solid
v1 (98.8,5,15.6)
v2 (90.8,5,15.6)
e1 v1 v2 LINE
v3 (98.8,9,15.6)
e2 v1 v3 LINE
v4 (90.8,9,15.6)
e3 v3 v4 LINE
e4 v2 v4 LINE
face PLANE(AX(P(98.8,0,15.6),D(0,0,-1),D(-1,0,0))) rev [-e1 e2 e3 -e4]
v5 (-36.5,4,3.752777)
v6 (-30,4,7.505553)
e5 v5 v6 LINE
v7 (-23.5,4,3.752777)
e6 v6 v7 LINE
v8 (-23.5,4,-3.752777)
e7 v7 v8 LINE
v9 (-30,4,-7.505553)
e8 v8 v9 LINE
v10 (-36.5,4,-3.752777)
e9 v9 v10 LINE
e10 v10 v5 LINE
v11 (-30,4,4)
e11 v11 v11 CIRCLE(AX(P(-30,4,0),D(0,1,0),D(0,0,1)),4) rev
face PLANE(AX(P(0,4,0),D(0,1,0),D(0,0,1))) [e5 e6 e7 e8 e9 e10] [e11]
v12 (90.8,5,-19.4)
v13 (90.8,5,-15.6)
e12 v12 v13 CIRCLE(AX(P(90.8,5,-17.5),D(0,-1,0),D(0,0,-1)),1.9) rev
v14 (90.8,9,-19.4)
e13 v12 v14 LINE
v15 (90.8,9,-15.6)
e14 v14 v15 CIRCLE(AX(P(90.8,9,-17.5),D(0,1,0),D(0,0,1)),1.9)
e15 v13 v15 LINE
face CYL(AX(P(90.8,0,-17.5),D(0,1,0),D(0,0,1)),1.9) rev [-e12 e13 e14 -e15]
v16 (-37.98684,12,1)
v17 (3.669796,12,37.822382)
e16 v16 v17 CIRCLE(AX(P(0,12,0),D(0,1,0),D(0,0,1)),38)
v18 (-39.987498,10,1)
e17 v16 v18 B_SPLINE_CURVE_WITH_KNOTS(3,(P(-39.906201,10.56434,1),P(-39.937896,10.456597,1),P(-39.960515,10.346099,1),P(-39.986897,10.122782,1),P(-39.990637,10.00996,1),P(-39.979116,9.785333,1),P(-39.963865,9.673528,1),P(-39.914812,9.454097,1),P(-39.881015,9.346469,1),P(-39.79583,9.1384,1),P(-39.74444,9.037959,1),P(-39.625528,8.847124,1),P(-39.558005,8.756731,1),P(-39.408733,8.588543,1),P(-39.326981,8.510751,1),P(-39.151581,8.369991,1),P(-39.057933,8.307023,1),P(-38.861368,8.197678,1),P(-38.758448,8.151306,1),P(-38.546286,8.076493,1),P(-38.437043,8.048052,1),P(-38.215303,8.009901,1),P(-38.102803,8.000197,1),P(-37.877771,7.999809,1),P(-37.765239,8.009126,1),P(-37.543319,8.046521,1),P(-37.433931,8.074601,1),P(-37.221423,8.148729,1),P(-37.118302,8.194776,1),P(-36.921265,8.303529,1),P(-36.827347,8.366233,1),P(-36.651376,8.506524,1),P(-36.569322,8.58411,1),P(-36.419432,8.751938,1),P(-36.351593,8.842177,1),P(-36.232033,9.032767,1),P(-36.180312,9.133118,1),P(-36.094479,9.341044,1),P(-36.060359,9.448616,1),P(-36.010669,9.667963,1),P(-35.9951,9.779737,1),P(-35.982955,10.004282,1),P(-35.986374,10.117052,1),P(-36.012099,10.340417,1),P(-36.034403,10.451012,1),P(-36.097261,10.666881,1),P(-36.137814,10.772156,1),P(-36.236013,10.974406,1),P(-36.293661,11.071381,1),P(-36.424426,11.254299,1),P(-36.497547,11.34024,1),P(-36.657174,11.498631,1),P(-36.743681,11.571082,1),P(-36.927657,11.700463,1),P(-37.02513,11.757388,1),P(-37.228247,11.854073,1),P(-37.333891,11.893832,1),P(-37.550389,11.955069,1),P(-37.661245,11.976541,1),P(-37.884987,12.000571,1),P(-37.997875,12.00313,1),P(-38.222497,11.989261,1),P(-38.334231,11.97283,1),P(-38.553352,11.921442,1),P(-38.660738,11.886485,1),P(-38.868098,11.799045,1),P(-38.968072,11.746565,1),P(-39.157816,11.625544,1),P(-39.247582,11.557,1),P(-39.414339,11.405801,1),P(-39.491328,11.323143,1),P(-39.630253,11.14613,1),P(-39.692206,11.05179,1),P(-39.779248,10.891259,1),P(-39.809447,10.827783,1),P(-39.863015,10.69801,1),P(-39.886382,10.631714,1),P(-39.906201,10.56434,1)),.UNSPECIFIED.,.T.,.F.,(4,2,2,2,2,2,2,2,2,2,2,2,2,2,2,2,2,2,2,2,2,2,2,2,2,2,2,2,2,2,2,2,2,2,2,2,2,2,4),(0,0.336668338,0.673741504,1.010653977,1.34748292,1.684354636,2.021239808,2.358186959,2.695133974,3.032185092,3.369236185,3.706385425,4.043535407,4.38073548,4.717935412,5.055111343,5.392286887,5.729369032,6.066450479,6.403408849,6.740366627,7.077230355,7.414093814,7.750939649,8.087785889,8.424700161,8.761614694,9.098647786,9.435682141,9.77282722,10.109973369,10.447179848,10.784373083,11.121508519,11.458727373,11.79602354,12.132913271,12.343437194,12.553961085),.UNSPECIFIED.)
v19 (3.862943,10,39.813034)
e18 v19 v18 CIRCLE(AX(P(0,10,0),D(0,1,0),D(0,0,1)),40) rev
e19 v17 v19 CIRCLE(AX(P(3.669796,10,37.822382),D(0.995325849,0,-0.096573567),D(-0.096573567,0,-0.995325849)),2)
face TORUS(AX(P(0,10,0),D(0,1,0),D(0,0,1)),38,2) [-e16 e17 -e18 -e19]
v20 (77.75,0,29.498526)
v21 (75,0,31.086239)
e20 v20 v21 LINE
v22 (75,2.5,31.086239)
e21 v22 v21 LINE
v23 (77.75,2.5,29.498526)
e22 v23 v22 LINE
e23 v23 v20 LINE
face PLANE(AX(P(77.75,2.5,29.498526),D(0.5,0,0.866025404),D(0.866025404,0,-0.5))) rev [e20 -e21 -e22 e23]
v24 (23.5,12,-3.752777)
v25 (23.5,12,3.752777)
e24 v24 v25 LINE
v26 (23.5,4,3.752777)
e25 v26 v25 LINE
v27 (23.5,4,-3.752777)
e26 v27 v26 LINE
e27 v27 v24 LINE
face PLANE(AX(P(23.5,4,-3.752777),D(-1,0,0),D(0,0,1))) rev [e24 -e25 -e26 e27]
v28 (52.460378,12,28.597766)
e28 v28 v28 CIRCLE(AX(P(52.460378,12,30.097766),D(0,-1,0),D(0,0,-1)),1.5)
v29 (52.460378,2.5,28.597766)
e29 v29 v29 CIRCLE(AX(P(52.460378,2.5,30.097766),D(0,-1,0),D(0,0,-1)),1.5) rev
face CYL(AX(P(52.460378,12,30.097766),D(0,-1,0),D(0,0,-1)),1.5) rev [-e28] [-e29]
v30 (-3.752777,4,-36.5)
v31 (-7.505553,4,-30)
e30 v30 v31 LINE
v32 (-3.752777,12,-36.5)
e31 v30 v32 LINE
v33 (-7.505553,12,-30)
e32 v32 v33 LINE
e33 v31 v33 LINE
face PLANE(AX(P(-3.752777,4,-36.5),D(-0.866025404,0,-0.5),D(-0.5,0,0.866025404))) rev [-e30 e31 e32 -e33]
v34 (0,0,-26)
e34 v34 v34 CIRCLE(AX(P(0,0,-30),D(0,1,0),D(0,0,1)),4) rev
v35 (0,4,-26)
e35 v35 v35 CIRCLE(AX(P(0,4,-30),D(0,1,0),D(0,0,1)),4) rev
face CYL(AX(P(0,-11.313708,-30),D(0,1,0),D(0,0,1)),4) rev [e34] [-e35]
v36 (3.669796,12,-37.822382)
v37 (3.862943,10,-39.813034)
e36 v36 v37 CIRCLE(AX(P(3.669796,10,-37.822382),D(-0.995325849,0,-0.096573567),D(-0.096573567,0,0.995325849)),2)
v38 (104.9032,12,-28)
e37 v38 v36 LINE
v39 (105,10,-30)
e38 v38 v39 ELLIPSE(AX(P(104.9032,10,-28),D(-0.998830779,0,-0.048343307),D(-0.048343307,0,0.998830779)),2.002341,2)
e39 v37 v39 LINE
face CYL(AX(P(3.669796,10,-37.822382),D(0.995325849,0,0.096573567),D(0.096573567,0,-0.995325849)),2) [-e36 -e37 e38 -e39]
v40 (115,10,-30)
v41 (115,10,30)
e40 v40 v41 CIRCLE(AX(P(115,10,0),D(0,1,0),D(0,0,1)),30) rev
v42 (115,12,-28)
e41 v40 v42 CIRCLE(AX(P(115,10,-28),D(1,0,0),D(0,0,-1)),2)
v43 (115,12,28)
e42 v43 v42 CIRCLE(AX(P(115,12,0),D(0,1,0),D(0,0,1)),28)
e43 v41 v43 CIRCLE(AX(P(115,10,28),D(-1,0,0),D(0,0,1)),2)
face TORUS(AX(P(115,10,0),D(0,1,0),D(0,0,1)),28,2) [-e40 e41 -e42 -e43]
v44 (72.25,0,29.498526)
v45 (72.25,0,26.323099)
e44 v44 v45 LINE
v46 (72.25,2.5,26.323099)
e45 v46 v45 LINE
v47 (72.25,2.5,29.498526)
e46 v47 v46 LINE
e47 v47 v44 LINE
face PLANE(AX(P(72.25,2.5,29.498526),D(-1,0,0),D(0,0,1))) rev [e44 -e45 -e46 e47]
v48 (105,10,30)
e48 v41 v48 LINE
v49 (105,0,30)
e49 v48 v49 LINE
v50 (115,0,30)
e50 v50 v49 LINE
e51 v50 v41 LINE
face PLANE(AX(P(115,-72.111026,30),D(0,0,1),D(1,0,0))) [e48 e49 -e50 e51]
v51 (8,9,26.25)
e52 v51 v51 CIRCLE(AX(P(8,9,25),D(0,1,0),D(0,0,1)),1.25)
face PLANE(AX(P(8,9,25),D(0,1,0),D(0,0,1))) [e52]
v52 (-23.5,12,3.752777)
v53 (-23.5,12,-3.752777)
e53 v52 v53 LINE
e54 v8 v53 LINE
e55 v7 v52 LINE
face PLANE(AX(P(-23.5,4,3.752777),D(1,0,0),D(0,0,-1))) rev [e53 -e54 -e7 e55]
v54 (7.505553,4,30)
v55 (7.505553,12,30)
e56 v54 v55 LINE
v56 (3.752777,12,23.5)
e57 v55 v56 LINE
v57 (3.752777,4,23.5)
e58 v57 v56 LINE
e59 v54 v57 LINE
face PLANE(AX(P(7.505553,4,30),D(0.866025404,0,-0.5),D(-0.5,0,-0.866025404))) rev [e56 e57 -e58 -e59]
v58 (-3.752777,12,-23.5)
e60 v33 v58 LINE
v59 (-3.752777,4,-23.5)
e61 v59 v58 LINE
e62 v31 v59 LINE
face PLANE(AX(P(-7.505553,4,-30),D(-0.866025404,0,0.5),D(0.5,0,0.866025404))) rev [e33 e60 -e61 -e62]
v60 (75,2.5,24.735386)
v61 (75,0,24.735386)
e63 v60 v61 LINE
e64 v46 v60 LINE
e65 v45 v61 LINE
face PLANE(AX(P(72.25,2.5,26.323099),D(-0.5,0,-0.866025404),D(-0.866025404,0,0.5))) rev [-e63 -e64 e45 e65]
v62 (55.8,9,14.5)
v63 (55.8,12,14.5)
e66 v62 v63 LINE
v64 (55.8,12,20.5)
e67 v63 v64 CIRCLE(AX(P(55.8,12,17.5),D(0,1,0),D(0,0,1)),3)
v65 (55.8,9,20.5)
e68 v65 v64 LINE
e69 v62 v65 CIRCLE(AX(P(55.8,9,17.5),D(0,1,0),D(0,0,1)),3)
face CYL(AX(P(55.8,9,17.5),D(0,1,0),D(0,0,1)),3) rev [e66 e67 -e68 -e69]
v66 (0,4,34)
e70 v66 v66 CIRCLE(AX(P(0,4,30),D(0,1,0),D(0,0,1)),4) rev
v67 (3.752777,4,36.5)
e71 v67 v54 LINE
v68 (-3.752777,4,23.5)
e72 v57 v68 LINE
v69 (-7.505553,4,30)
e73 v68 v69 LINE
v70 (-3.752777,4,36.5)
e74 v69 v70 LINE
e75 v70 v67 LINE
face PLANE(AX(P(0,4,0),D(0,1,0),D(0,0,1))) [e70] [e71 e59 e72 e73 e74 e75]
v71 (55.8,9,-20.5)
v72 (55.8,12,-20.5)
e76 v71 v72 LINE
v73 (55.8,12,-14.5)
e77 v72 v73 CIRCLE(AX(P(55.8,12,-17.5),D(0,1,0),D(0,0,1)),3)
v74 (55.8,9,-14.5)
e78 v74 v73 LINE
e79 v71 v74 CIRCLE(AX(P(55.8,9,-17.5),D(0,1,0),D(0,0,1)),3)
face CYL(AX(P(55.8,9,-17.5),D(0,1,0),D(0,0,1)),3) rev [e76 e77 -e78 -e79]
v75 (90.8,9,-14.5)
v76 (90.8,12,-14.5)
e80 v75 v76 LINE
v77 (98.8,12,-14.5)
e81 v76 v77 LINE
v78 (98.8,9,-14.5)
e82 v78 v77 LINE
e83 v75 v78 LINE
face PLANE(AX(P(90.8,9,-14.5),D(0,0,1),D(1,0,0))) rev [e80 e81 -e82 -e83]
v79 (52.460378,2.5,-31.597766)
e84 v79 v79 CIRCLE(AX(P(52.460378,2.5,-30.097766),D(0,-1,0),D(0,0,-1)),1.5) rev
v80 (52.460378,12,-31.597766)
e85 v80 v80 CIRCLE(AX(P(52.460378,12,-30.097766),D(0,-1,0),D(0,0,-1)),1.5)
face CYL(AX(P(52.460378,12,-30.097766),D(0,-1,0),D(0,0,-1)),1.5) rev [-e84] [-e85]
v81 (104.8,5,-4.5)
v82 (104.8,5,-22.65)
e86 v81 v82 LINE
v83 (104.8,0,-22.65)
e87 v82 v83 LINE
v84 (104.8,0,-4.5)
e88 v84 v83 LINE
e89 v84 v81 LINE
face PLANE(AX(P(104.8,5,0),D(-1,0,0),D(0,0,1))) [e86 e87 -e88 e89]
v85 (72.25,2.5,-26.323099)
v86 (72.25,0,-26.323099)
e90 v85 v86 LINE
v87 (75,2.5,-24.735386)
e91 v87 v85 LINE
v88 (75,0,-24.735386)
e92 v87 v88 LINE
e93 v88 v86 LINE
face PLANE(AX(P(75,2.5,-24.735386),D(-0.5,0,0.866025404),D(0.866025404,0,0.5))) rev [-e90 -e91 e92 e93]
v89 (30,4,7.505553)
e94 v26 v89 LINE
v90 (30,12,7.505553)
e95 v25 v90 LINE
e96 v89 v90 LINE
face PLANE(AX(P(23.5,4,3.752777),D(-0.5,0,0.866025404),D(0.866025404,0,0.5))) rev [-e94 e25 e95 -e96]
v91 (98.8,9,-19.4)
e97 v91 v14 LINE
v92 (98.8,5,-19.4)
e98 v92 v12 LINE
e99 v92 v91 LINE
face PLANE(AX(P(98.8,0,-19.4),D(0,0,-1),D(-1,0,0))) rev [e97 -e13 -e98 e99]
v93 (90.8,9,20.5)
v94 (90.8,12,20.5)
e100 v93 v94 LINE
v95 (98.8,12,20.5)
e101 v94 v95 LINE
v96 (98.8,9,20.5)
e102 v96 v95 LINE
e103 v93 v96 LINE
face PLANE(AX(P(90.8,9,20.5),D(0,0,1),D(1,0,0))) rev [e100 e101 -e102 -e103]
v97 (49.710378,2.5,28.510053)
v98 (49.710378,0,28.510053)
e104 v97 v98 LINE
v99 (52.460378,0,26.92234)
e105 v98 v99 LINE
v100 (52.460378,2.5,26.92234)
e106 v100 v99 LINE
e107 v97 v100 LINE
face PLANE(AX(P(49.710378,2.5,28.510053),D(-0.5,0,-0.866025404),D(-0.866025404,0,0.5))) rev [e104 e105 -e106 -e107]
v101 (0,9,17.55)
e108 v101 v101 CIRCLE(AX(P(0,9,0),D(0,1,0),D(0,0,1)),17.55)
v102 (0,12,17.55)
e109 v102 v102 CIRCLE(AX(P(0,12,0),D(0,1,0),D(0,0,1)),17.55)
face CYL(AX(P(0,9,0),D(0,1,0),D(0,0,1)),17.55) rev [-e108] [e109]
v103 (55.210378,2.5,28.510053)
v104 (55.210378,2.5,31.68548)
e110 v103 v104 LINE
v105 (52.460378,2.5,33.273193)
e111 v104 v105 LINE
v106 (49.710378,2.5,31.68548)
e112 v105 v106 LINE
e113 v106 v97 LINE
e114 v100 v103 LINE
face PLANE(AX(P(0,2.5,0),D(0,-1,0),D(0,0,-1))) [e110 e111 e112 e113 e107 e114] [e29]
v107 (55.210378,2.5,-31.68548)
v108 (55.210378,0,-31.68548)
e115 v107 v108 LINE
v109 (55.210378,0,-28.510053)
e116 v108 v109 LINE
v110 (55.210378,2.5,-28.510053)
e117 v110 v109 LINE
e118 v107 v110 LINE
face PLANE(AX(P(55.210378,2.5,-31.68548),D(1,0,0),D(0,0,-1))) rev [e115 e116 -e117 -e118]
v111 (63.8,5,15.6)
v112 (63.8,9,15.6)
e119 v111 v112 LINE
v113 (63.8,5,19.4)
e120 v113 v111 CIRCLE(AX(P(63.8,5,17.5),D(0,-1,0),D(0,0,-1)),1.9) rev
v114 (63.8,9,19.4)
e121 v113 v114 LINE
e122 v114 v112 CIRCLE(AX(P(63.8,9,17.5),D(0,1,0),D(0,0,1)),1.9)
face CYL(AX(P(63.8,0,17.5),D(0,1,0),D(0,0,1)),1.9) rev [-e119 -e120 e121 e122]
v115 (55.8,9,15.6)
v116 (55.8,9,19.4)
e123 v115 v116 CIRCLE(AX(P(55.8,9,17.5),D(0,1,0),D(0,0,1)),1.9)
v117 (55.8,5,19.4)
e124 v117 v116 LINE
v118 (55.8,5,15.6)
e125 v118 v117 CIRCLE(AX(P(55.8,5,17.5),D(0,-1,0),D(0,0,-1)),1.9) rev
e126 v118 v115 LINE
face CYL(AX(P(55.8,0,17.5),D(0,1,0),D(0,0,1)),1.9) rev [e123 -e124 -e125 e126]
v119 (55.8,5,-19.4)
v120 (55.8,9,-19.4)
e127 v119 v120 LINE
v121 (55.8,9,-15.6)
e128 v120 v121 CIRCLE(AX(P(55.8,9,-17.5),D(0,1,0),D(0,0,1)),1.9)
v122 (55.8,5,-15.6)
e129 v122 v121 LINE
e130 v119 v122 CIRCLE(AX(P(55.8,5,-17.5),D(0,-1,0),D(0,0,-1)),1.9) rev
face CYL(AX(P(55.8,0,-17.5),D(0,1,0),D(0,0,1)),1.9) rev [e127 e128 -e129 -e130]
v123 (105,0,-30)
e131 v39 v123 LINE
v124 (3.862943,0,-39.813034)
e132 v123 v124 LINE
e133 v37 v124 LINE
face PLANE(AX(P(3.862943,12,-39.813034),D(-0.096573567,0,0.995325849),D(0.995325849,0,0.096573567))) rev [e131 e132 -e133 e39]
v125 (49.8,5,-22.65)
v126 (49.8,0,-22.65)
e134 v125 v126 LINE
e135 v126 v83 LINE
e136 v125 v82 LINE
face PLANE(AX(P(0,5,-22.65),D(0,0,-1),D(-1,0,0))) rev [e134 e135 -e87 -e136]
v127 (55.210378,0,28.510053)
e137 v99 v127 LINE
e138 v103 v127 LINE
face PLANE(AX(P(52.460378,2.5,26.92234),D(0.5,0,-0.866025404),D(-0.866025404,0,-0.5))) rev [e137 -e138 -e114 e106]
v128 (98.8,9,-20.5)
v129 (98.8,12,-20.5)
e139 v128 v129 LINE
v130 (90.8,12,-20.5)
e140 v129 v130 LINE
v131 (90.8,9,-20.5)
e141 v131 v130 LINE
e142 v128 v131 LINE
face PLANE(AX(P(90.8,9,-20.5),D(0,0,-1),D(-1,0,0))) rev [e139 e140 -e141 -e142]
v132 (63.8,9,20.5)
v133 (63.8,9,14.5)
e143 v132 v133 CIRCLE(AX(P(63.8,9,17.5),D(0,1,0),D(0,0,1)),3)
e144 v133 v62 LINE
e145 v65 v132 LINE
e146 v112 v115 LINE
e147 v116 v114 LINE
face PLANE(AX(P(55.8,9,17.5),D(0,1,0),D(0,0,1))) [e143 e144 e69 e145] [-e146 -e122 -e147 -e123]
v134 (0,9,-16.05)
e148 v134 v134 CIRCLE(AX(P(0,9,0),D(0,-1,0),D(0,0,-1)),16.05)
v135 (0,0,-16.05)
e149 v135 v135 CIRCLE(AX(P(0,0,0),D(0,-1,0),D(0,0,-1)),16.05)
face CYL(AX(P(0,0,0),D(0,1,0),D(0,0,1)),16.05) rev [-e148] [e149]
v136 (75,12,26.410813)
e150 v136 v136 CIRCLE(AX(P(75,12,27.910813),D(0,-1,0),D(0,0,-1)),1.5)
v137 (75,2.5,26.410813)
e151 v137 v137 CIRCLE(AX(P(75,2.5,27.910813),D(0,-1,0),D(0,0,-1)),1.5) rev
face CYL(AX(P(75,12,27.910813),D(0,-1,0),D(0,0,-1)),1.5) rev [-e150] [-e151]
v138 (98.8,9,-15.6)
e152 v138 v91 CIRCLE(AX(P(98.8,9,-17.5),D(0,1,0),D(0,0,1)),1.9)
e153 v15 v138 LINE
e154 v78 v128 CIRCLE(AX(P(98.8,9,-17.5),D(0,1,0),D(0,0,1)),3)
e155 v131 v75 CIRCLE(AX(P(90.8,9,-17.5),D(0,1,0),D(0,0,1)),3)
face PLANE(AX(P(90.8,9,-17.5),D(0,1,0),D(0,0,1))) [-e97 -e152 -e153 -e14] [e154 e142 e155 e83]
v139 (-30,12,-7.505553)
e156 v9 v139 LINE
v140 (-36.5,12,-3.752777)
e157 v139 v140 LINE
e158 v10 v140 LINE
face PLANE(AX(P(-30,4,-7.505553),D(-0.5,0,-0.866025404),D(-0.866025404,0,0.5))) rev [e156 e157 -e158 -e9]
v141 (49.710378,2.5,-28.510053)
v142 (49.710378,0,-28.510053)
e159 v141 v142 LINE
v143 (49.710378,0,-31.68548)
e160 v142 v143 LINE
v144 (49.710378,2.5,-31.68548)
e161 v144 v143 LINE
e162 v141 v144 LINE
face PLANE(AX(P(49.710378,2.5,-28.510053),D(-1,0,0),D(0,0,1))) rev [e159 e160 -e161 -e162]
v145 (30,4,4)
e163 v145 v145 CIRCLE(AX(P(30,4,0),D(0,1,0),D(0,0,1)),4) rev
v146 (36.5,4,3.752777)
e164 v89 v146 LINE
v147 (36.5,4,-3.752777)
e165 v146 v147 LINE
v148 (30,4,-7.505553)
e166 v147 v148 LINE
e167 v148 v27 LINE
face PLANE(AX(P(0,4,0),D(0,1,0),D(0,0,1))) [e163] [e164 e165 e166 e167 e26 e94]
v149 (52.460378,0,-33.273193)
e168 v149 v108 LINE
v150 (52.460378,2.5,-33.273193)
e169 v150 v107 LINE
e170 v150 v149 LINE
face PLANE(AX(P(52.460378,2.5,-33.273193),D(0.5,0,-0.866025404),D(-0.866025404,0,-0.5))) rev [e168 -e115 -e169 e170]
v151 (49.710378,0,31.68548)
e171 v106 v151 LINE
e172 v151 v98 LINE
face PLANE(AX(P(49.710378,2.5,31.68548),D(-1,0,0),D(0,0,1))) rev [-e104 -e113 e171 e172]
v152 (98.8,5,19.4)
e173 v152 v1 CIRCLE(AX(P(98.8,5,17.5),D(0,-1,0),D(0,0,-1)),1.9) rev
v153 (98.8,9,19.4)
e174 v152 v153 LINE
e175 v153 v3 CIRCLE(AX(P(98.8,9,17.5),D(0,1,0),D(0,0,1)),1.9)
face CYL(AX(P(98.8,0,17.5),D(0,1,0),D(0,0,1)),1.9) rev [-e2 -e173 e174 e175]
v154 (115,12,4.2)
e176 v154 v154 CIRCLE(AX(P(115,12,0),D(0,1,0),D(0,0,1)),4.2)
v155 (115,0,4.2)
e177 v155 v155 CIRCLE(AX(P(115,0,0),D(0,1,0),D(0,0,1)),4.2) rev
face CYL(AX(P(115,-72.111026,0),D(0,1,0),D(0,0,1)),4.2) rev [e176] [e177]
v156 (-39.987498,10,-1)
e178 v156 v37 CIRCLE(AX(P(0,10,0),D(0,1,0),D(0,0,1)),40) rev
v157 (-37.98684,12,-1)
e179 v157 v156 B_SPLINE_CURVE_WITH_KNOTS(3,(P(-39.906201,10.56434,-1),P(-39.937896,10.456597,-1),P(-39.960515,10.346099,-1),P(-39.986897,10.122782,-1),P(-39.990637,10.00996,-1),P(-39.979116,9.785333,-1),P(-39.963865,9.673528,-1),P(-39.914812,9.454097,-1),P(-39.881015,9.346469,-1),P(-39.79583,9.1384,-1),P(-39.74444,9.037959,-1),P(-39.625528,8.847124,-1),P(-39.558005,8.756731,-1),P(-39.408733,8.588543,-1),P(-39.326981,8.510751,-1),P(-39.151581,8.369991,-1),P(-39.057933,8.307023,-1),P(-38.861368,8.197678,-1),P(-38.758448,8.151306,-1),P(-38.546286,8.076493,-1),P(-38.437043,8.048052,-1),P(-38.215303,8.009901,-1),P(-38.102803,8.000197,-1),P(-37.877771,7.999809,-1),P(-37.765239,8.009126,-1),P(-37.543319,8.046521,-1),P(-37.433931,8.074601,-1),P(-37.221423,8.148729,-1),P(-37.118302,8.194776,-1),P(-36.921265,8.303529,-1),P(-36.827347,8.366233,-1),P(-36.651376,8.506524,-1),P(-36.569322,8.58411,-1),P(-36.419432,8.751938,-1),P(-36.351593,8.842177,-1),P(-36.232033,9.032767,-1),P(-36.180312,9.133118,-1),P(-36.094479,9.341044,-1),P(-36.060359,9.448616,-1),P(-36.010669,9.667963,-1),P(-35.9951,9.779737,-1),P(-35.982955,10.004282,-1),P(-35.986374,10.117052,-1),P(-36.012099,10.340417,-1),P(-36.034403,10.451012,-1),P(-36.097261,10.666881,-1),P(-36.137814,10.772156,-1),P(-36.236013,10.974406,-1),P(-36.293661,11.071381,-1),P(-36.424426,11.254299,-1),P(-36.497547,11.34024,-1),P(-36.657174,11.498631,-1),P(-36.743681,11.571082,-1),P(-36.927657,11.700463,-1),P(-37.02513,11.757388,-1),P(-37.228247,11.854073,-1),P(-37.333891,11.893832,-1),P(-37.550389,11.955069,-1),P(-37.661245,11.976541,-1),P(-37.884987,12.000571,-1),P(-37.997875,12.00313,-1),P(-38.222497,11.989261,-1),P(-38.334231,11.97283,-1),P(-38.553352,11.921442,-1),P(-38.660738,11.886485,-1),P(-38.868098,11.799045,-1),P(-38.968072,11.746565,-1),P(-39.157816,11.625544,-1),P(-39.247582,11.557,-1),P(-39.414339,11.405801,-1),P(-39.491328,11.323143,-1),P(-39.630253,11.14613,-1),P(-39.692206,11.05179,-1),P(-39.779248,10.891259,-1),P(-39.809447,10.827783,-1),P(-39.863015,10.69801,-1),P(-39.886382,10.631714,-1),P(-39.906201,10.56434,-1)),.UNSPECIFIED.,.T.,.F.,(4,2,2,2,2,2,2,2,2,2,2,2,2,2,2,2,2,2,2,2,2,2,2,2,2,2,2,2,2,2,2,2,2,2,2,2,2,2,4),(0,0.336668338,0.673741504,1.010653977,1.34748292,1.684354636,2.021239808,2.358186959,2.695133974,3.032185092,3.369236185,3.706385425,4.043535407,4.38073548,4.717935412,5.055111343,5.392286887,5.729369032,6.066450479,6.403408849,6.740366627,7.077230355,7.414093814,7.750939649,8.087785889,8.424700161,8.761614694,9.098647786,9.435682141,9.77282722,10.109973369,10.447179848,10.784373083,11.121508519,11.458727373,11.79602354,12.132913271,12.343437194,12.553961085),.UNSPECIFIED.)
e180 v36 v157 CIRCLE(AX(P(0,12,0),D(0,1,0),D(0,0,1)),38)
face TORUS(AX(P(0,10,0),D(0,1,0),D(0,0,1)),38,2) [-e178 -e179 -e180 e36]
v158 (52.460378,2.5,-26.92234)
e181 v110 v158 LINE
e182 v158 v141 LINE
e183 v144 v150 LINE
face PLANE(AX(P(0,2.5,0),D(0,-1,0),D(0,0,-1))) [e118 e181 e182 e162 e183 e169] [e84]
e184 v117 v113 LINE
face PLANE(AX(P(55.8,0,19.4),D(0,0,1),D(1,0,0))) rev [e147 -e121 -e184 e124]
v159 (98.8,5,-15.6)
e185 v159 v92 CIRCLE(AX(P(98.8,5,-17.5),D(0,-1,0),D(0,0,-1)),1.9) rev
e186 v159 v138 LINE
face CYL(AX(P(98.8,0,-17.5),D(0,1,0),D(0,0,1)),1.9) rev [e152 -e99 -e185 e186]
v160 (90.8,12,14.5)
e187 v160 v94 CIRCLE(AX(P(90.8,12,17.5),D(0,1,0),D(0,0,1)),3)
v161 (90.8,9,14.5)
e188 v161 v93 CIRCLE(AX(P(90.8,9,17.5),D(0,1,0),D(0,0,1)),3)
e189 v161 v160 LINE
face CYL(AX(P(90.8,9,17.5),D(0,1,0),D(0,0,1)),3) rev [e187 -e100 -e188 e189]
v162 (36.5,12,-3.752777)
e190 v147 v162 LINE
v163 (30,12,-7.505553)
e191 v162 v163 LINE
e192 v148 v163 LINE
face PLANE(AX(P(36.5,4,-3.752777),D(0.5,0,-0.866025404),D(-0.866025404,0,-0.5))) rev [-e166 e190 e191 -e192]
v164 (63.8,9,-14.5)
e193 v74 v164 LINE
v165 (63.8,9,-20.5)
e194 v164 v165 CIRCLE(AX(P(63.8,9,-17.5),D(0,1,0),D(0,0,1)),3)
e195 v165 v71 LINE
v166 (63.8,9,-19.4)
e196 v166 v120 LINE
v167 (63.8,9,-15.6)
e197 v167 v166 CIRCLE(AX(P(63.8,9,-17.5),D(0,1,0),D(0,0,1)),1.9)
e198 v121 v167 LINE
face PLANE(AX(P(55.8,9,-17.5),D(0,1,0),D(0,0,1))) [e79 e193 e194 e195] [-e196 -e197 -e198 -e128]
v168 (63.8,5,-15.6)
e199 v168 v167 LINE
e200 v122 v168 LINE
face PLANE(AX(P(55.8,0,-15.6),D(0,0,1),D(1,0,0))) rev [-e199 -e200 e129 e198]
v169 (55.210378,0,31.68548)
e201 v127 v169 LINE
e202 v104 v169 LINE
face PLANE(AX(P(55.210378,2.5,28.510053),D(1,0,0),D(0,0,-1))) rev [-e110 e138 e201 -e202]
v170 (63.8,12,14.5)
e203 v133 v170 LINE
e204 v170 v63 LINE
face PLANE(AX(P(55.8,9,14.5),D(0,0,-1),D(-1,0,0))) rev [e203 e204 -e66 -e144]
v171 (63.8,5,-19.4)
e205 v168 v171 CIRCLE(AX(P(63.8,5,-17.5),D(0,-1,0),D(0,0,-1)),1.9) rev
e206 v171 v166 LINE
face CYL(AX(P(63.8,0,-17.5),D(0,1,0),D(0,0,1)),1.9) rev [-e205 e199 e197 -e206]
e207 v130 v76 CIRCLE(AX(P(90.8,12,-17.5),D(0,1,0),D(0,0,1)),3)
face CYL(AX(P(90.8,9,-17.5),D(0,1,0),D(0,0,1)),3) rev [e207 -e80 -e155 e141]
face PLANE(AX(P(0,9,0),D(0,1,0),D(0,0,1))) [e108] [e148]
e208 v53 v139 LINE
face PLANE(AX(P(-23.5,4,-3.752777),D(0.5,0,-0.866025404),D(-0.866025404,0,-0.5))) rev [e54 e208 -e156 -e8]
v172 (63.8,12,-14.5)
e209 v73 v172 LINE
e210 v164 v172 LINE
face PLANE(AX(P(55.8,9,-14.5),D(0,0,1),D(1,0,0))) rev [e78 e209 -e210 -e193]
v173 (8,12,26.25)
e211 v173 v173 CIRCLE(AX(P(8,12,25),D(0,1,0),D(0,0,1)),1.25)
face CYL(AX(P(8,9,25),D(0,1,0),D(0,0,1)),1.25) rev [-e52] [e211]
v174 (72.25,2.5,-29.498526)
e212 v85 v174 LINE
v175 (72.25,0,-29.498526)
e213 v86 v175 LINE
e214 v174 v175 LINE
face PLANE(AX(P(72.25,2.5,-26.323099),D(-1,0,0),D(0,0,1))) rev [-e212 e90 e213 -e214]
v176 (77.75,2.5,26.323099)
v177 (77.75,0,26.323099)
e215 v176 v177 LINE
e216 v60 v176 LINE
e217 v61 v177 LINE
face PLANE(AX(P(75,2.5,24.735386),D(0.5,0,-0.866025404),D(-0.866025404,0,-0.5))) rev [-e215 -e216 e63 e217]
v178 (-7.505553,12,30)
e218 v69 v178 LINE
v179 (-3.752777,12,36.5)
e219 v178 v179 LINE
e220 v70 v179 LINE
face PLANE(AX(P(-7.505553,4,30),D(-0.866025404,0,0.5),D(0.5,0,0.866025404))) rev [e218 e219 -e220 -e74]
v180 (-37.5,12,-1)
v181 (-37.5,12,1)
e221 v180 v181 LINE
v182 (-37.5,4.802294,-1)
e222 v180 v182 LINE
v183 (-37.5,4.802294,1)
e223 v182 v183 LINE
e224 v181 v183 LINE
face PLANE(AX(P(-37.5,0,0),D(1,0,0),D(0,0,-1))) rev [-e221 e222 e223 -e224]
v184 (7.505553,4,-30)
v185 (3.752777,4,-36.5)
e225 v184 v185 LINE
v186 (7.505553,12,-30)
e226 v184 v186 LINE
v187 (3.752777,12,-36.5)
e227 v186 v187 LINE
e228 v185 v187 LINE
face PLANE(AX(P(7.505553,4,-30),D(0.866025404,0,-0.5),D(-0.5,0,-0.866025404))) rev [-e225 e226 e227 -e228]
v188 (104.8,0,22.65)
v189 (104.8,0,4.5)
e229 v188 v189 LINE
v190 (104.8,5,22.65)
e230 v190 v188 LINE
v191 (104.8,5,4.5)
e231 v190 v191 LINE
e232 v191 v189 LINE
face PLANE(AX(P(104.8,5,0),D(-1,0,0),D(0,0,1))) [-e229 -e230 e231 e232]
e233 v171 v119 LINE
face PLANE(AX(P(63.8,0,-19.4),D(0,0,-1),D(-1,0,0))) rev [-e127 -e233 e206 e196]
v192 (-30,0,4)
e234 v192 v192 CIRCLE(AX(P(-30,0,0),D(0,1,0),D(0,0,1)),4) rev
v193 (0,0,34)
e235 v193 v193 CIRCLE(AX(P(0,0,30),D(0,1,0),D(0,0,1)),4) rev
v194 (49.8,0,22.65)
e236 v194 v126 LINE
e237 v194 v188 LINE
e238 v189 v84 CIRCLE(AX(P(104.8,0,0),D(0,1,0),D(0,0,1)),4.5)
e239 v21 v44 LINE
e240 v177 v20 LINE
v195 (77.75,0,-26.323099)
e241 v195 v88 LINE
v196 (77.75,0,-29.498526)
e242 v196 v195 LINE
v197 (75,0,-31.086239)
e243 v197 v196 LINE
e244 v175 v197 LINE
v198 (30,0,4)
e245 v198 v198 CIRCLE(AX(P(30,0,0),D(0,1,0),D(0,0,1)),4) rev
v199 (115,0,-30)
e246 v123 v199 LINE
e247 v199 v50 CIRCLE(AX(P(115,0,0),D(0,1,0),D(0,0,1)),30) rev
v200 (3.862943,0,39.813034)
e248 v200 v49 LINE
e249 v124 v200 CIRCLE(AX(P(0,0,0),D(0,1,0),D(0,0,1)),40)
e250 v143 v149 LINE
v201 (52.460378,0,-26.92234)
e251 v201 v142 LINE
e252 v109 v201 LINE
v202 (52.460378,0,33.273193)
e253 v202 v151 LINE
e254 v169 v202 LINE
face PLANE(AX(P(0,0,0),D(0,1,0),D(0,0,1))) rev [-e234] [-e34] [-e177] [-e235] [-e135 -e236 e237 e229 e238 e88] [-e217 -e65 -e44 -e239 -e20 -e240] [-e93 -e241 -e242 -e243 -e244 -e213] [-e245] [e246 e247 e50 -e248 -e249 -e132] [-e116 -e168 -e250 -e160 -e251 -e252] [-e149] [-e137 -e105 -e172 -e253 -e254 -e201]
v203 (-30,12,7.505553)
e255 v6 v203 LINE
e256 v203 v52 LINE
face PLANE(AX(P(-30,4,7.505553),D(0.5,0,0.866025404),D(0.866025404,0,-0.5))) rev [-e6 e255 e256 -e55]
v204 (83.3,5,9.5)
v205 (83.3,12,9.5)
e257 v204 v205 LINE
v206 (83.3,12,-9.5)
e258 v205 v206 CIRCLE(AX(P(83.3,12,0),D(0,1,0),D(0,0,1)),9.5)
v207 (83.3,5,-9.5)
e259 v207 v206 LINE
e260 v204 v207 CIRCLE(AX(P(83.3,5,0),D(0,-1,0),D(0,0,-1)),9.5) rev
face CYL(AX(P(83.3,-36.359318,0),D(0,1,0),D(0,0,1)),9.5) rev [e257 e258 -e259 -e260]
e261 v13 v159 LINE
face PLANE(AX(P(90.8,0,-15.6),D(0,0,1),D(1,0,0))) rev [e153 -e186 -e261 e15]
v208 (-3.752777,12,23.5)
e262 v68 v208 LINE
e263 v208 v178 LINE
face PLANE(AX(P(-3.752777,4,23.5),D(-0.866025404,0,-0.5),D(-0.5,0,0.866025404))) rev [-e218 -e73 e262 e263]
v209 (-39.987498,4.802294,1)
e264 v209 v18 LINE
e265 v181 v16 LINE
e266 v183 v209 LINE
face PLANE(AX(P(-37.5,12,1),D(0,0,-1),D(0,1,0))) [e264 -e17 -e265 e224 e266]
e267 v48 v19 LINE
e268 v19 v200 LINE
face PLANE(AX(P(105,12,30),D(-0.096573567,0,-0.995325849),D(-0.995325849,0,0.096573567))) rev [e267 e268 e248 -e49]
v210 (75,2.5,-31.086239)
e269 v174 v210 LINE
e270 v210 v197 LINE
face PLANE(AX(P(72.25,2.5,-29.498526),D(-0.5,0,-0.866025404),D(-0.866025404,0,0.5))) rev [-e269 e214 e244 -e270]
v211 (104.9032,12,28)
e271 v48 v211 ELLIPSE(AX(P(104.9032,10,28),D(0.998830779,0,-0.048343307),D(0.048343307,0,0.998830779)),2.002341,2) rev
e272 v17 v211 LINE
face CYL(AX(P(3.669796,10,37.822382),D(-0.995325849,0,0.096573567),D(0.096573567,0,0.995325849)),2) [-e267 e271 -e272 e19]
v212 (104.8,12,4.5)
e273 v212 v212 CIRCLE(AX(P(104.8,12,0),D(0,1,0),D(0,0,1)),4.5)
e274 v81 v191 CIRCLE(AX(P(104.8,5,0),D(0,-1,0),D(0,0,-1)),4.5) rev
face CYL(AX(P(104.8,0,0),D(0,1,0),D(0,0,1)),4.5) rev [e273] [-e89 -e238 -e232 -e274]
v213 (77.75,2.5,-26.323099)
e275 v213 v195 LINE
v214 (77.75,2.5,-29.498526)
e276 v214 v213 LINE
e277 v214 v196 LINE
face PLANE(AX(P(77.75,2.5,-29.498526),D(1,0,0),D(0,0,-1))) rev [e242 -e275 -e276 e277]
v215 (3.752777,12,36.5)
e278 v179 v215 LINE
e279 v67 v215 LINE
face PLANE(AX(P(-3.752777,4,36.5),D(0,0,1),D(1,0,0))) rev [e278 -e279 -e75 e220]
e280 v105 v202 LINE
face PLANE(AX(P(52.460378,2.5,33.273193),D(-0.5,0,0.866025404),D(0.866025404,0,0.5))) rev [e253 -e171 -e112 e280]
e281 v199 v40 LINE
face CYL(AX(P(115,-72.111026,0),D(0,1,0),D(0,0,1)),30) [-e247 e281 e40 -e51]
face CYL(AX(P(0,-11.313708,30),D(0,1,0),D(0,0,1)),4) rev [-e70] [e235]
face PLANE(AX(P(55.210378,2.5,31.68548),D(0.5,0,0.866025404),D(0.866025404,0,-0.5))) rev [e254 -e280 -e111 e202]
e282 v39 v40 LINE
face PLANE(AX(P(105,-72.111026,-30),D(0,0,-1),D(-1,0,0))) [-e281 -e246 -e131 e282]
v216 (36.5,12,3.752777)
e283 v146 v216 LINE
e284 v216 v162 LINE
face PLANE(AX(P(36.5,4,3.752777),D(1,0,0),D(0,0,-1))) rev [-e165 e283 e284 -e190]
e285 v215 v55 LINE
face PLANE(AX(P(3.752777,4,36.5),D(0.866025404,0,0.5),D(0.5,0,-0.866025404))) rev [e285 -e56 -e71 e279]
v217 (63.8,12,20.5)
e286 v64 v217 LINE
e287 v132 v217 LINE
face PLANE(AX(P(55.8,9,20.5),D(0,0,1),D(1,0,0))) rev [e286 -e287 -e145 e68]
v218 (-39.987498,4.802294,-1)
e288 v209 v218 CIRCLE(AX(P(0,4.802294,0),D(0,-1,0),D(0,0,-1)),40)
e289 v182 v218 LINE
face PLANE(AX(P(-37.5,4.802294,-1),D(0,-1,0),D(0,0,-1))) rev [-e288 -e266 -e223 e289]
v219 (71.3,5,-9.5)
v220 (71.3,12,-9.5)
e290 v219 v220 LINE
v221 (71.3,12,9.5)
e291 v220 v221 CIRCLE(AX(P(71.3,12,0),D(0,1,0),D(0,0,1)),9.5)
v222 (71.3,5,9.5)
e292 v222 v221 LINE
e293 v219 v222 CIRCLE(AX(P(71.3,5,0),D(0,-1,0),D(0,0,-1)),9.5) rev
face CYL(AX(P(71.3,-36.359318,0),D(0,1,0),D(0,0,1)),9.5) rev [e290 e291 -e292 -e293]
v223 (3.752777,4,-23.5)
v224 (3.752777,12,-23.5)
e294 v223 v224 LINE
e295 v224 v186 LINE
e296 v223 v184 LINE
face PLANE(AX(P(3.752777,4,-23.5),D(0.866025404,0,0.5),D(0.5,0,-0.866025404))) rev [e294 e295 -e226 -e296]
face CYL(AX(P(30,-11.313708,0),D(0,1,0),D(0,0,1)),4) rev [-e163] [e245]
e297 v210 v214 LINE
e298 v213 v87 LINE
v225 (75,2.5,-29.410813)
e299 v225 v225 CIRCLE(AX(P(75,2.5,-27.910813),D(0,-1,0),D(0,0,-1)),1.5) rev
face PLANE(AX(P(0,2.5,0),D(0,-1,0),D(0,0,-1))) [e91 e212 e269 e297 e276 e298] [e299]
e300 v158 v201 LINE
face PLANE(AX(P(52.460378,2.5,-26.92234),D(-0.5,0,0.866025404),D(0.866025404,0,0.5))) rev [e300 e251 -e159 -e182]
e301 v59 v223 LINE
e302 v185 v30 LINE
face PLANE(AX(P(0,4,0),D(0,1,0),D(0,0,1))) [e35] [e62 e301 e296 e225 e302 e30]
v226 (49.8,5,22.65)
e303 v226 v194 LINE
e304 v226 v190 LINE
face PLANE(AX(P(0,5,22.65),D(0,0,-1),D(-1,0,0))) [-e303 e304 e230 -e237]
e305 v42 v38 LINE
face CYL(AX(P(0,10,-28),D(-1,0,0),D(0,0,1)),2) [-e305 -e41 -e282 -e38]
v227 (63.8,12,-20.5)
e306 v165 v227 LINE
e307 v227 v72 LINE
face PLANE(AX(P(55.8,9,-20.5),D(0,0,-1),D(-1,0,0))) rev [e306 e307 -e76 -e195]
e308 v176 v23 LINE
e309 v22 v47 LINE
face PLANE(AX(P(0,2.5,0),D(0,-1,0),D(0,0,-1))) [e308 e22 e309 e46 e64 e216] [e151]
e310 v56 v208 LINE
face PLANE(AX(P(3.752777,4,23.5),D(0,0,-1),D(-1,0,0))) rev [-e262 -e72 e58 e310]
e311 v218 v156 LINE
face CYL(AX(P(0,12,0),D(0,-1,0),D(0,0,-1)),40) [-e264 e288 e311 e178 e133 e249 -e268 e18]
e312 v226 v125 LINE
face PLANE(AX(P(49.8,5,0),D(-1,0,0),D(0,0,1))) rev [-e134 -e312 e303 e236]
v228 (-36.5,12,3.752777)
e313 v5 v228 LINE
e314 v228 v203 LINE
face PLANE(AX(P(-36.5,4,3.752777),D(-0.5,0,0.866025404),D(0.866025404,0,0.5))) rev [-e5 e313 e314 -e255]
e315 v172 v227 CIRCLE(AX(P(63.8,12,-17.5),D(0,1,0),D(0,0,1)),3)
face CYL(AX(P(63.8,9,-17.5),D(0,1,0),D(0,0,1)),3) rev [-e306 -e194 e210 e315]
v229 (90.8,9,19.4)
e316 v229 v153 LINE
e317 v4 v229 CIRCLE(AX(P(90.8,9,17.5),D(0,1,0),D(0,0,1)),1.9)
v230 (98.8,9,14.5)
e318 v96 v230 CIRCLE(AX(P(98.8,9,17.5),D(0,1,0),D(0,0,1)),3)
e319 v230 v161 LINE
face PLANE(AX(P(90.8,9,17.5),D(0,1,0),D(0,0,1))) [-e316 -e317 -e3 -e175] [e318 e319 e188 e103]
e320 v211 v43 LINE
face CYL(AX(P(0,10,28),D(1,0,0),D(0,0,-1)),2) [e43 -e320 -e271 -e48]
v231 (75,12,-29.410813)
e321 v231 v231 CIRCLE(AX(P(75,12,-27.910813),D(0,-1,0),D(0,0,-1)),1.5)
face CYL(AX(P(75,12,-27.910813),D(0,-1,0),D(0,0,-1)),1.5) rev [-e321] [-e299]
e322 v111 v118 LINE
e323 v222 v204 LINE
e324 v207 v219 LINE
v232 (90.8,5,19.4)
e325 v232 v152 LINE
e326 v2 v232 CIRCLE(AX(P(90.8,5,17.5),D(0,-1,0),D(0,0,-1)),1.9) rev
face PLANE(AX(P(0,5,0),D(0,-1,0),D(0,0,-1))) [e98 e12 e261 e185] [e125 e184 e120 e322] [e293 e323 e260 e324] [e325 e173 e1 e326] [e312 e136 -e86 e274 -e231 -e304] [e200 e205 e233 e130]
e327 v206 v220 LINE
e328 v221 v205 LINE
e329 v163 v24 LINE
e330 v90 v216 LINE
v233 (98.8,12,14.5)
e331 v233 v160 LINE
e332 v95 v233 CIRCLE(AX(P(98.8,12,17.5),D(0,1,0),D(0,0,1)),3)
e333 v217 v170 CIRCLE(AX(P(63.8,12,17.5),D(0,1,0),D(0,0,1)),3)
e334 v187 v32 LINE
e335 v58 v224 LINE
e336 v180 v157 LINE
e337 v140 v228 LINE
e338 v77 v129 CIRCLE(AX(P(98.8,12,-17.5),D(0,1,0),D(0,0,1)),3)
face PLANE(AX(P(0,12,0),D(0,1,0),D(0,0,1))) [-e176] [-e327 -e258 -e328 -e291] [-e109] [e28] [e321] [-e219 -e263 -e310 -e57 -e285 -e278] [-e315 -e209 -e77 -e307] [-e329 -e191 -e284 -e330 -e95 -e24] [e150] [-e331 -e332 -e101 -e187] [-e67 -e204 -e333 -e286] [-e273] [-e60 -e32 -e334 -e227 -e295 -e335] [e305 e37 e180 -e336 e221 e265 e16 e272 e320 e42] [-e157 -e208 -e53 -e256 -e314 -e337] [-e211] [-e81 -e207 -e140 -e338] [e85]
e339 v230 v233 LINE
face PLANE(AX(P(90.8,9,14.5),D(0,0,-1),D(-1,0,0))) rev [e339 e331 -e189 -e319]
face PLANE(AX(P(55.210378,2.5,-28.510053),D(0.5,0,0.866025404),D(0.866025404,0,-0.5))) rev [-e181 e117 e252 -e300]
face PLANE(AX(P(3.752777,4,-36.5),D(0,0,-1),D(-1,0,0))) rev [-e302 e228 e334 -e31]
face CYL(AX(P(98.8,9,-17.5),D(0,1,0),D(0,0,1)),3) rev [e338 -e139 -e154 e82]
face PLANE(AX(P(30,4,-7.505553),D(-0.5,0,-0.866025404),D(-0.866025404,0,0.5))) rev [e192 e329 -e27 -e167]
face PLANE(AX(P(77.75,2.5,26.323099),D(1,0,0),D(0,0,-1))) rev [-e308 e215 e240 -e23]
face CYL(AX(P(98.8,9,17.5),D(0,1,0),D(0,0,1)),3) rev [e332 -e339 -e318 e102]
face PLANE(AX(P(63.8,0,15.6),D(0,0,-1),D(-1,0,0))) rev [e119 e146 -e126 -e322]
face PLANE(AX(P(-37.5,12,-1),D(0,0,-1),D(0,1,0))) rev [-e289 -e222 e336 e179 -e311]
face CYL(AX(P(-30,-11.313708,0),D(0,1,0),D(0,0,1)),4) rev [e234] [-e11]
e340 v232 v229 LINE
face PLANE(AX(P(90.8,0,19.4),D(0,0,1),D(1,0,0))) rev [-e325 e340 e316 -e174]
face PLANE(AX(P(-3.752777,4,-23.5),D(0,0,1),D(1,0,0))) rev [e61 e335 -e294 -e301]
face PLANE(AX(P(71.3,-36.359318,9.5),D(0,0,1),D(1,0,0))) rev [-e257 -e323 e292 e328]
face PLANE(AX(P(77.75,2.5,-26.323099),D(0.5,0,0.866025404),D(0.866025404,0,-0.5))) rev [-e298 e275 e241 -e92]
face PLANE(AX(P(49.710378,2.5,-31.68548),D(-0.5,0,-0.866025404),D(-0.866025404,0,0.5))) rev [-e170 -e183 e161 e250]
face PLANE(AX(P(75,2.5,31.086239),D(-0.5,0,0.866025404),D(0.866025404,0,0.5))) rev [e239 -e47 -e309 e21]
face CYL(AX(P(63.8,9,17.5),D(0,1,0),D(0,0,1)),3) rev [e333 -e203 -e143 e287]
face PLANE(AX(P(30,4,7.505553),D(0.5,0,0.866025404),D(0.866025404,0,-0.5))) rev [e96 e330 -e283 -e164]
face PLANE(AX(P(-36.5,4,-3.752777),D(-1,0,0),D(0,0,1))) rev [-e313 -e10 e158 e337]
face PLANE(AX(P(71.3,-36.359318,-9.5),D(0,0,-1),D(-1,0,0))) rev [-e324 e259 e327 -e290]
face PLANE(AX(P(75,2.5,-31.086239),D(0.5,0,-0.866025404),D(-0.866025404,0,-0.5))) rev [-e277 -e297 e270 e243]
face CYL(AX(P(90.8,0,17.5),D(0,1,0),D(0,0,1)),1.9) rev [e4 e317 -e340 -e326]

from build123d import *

# Parameters (mm, degrees)
SKETCH1_R            = 10
BOSS_EXTRUDE1_DEPTH  = 12
SKETCH2_R            = 17.55
CUT_EXTRUDE1_DEPTH   = 3
CUT_EXTRUDE2_DEPTH   = 12
SKETCH4_R            = 4
CUT_EXTRUDE3_DEPTH   = 12
SKETCH5_R            = 16.05
CUT_EXTRUDE4_DEPTH   = 113.720894248
CUT_EXTRUDE6_DEPTH   = 8
CUT_EXTRUDE7_DEPTH   = 3
SKETCH11_R           = 4.2
BOSS_EXTRUDE2_DEPTH  = 12
CUT_EXTRUDE_1_DEPTH  = 151.685102117
SKETCH_1_R           = 4.5
CUT_EXTRUDE_4_DEPTH  = 151.894002532
SKETCH6_W            = 55
SKETCH6_H            = 45.3
CUT_EXTRUDE_6_DEPTH  = 5
SKETCH_6_R           = 1.25
CUT_EXTRUDE_9_DEPTH  = 3
SKETCH_7_R           = 1.5
CUT_EXTRUDE_10_DEPTH = 151.894002532
CUT_EXTRUDE_11_DEPTH = 2.5
FILLET_1_R           = 2
FILLET_2_R           = 2
SKETCH_8_W           = 2
SKETCH_8_H           = 7.197706212
CUT_EXTRUDE_12_DEPTH = 2.5


with BuildPart() as part:
    # Sketch1 → Boss-Extrude1 (new body)
    with BuildSketch(Plane(origin=(0, 0, 0), x_dir=(1, 0, 0), z_dir=(0, 1, 0))):
        with BuildLine():
            Line((3.862942675, 39.81303397), (105, 30))
            Line((105, 30), (105, -30))
            Line((105, -30), (3.862942675, -39.81303397))
            ThreePointArc((3.862942675, -39.81303397), (-40, 0), (3.862942675, 39.81303397))
        make_face()
        with Locations(Location((0, 0, 0), (0, 0, 270))):
            Circle(SKETCH1_R, mode=Mode.SUBTRACT)
    extrude(amount=BOSS_EXTRUDE1_DEPTH)

    # Sketch2 → Cut-Extrude1 (cut)
    with BuildSketch(Plane(origin=(0, 12, 0), x_dir=(1, 0, 0), z_dir=(0, 1, 0))):
        with Locations(Location((0, 0, 0), (0, 0, 270))):
            Circle(SKETCH2_R)
    extrude(amount=-CUT_EXTRUDE1_DEPTH, mode=Mode.SUBTRACT)

    # Sketch3 → Cut-Extrude2 (cut)
    with BuildSketch(Plane(origin=(0, 12, 0), x_dir=(1, 0, 0), z_dir=(0, 1, 0))):
        with BuildLine():
            Line((71.3, 9.5), (83.3, 9.5))
            ThreePointArc((83.3, 9.5), (92.8, 0), (83.3, -9.5))
            Line((83.3, -9.5), (71.3, -9.5))
            ThreePointArc((71.3, -9.5), (61.8, 0), (71.3, 9.5))
        make_face()
    extrude(amount=-CUT_EXTRUDE2_DEPTH, mode=Mode.SUBTRACT)

    # Sketch4 → Cut-Extrude3 (cut)
    with BuildSketch(Plane(origin=(0, 12, 0), x_dir=(1, 0, 0), z_dir=(0, 1, 0))):
        with Locations(Location((30, 0, 0), (0, 0, 270))):
            Circle(SKETCH4_R)
        with Locations(Location((0, -30, 0), (0, 0, 270))):
            Circle(SKETCH4_R)
        with Locations(Location((-30, 0, 0), (0, 0, 270))):
            Circle(SKETCH4_R)
        with Locations(Location((0, 30, 0), (0, 0, 270))):
            Circle(SKETCH4_R)
    extrude(amount=-CUT_EXTRUDE3_DEPTH, mode=Mode.SUBTRACT)

    # Sketch5 → Cut-Extrude4 (cut, through all)
    with BuildSketch(Plane.XZ.offset(-9)):
        with Locations(Location((0, 0, 0), (0, 0, 270))):
            Circle(SKETCH5_R)
    extrude(amount=CUT_EXTRUDE4_DEPTH, mode=Mode.SUBTRACT)

    # Sketch7 → Cut-Extrude6 (cut)
    with BuildSketch(Plane(origin=(0, 12, 0), x_dir=(1, 0, 0), z_dir=(0, 1, 0))):
        Polygon((-7.505553499, 30), (-3.75277675, 23.5), (3.75277675, 23.5), (7.505553499, 30), (3.75277675, 36.5), (-3.75277675, 36.5), align=None)
        Polygon((-30, -7.505553499), (-23.5, -3.75277675), (-23.5, 3.75277675), (-30, 7.505553499), (-36.5, 3.75277675), (-36.5, -3.75277675), align=None)
        Polygon((30, 7.505553499), (23.5, 3.75277675), (23.5, -3.75277675), (30, -7.505553499), (36.5, -3.75277675), (36.5, 3.75277675), align=None)
        Polygon((7.505553499, -30), (3.75277675, -23.5), (-3.75277675, -23.5), (-7.505553499, -30), (-3.75277675, -36.5), (3.75277675, -36.5), align=None)
    extrude(amount=-CUT_EXTRUDE6_DEPTH, mode=Mode.SUBTRACT)

    # Sketch9 → Cut-Extrude7 (cut)
    with BuildSketch(Plane(origin=(0, 12, 0), x_dir=(1, 0, 0), z_dir=(0, 1, 0))):
        with BuildLine():
            Line((55.8, 20.5), (63.8, 20.5))
            ThreePointArc((63.8, 20.5), (66.8, 17.5), (63.8, 14.5))
            Line((63.8, 14.5), (55.8, 14.5))
            ThreePointArc((55.8, 14.5), (52.8, 17.5), (55.8, 20.5))
        make_face()
        with BuildLine():
            Line((90.8, 20.5), (98.8, 20.5))
            ThreePointArc((98.8, 20.5), (101.8, 17.5), (98.8, 14.5))
            Line((98.8, 14.5), (90.8, 14.5))
            ThreePointArc((90.8, 14.5), (87.8, 17.5), (90.8, 20.5))
        make_face()
        with BuildLine():
            Line((55.8, -14.5), (63.8, -14.5))
            ThreePointArc((63.8, -14.5), (66.8, -17.5), (63.8, -20.5))
            Line((63.8, -20.5), (55.8, -20.5))
            ThreePointArc((55.8, -20.5), (52.8, -17.5), (55.8, -14.5))
        make_face()
        with BuildLine():
            Line((90.8, -14.5), (98.8, -14.5))
            ThreePointArc((98.8, -14.5), (101.8, -17.5), (98.8, -20.5))
            Line((98.8, -20.5), (90.8, -20.5))
            ThreePointArc((90.8, -20.5), (87.8, -17.5), (90.8, -14.5))
        make_face()
    extrude(amount=-CUT_EXTRUDE7_DEPTH, mode=Mode.SUBTRACT)

    # Sketch11 → Boss-Extrude2 (add)
    with BuildSketch(Plane(origin=(0, 12, 0), x_dir=(1, 0, 0), z_dir=(0, 1, 0))):
        with BuildLine():
            Line((105, -30), (105, 30))
            Line((105, 30), (115, 30))
            ThreePointArc((115, 30), (145, 0), (115, -30))
            Line((115, -30), (105, -30))
        make_face()
        with Locations(Location((115, 0, 0), (0, 0, 270))):
            Circle(SKETCH11_R, mode=Mode.SUBTRACT)
    extrude(amount=-BOSS_EXTRUDE2_DEPTH)

    # Sketch10 → 切除-拉伸1 (cut, through all)
    with BuildSketch(Plane(origin=(0, 9, 0), x_dir=(1, 0, 0), z_dir=(0, 1, 0))):
        with BuildLine():
            Line((55.8, 15.6), (63.8, 15.6))
            ThreePointArc((63.8, 15.6), (65.7, 17.5), (63.8, 19.4))
            Line((63.8, 19.4), (55.8, 19.4))
            ThreePointArc((55.8, 19.4), (53.9, 17.5), (55.8, 15.6))
        make_face()
        with BuildLine():
            Line((90.8, 15.6), (98.8, 15.6))
            ThreePointArc((98.8, 15.6), (100.7, 17.5), (98.8, 19.4))
            Line((98.8, 19.4), (90.8, 19.4))
            ThreePointArc((90.8, 19.4), (88.9, 17.5), (90.8, 15.6))
        make_face()
        with BuildLine():
            Line((55.8, -19.4), (63.8, -19.4))
            ThreePointArc((63.8, -19.4), (65.7, -17.5), (63.8, -15.6))
            Line((63.8, -15.6), (55.8, -15.6))
            ThreePointArc((55.8, -15.6), (53.9, -17.5), (55.8, -19.4))
        make_face()
        with BuildLine():
            Line((90.8, -19.4), (98.8, -19.4))
            ThreePointArc((98.8, -19.4), (100.7, -17.5), (98.8, -15.6))
            Line((98.8, -15.6), (90.8, -15.6))
            ThreePointArc((90.8, -15.6), (88.9, -17.5), (90.8, -19.4))
        make_face()
    extrude(amount=-CUT_EXTRUDE_1_DEPTH, mode=Mode.SUBTRACT)

    # 草图1 → 切除-拉伸4 (cut, through all)
    with BuildSketch(Plane(origin=(0, 12, 0), x_dir=(1, 0, 0), z_dir=(0, 1, 0))):
        with Locations(Location((104.8, 0, 0), (0, 0, 270))):
            Circle(SKETCH_1_R)
    extrude(amount=-CUT_EXTRUDE_4_DEPTH, mode=Mode.SUBTRACT)

    # Sketch6 → 切除-拉伸6 (cut)
    with BuildSketch(Plane.XZ):
        with Locations((77.3, 0)):
            Rectangle(SKETCH6_W, SKETCH6_H)
    extrude(amount=-CUT_EXTRUDE_6_DEPTH, mode=Mode.SUBTRACT)

    # 草图6 → 切除-拉伸9 (cut)
    with BuildSketch(Plane(origin=(0, 12, 0), x_dir=(1, 0, 0), z_dir=(0, 1, 0))):
        with Locations(Location((7.999999657, -25, 0), (0, 0, 270))):
            Circle(SKETCH_6_R)
    extrude(amount=-CUT_EXTRUDE_9_DEPTH, mode=Mode.SUBTRACT)

    # 草图7 → 切除-拉伸10 (cut, through all)
    with BuildSketch(Plane.XZ):
        with Locations(Location((75, -27.910812583, 0), (0, 0, 270))):
            Circle(SKETCH_7_R)
        with Locations(Location((75, 27.910812583, 0), (0, 0, 270))):
            Circle(SKETCH_7_R)
        with Locations(Location((52.460378125, -30.097766416, 0), (0, 0, 270))):
            Circle(SKETCH_7_R)
        with Locations(Location((52.460378125, 30.097766416, 0), (0, 0, 270))):
            Circle(SKETCH_7_R)
    extrude(amount=-CUT_EXTRUDE_10_DEPTH, mode=Mode.SUBTRACT)

    # 草图4 → 切除-拉伸11 (cut)
    with BuildSketch(Plane.XZ):
        Polygon((75, 24.735386103), (77.75, 26.323099343), (77.75, 29.498525824), (75, 31.086239064), (72.25, 29.498525824), (72.25, 26.323099343), align=None)
        Polygon((75, -31.086239064), (77.75, -29.498525824), (77.75, -26.323099343), (75, -24.735386103), (72.25, -26.323099343), (72.25, -29.498525824), align=None)
        Polygon((52.460378125, 26.922339935), (55.210378125, 28.510053176), (55.210378125, 31.685479656), (52.460378125, 33.273192896), (49.710378125, 31.685479656), (49.710378125, 28.510053176), align=None)
        Polygon((52.460378125, -33.273192896), (55.210378125, -31.685479656), (55.210378125, -28.510053176), (52.460378125, -26.922339935), (49.710378125, -28.510053176), (49.710378125, -31.685479656), align=None)
    extrude(amount=-CUT_EXTRUDE_11_DEPTH, mode=Mode.SUBTRACT)

    # 圆角1
    # the kernel refuses this fillet: 2 mm, written as the material it takes off along each edge
    with BuildSketch(Plane(origin=(3.862942675, 12, -39.81303397), x_dir=(0, -1, 0), z_dir=(0.9953258492472392, 0, 0.09657356688174112))) as fillet_1_piece_1_section:
        with BuildLine():
            CenterArc((FILLET_1_R, -FILLET_1_R), FILLET_1_R, 90, 90)
            Line((0, -FILLET_1_R), (0, 0))
            Line((0, 0), (FILLET_1_R, 0))
        make_face()
    fillet_1_piece_1 = extrude(amount=106.612007165, mode=Mode.PRIVATE)
    fillet_1_piece_1 = split(fillet_1_piece_1, bisect_by=Plane(origin=(52.168611778, 11.535533923, -30), z_dir=(0, 0, -1)), keep=Keep.TOP, mode=Mode.PRIVATE)
    add(fillet_1_piece_1, mode=Mode.SUBTRACT)
    with BuildSketch(Plane(origin=(0, 12, 0), x_dir=(0.09657356688174115, 0, 0.9953258492472392), z_dir=(0.9953258492472392, 0, -0.09657356688174115))) as fillet_1_piece_2:
        with BuildLine():
            CenterArc((40 - FILLET_1_R, FILLET_1_R), FILLET_1_R, 270, 90)
            Line((40 - FILLET_1_R, 0), (40, 0))
            Line((40, 0), (40, FILLET_1_R))
        make_face()
    revolve(axis=Axis((0, 12, 0), (0, -1, 0)), revolution_arc=191.083790079, mode=Mode.SUBTRACT)
    with BuildSketch(Plane(origin=(109.976629246, 12, 29.517132166), x_dir=(-0.09657356688174114, 0, -0.9953258492472393), z_dir=(-0.9953258492472392, 0, 0.09657356688174112))) as fillet_1_piece_3_section:
        with BuildLine():
            CenterArc((FILLET_1_R, FILLET_1_R), FILLET_1_R, 180, 90)
            Line((0, FILLET_1_R), (0, 0))
            Line((0, 0), (FILLET_1_R, 0))
        make_face()
    fillet_1_piece_3 = extrude(amount=106.612007165, mode=Mode.PRIVATE)
    fillet_1_piece_3 = split(fillet_1_piece_3, bisect_by=Plane(origin=(52.168611778, 11.535533923, 30), z_dir=(0, 0, 1)), keep=Keep.TOP, mode=Mode.PRIVATE)
    add(fillet_1_piece_3, mode=Mode.SUBTRACT)

    # 圆角2
    fillet_2_edges = [part.edges().sort_by_distance(p)[0] for p in [
        (99.645199693, 12, 30),
        (99.645199693, 12, -30),
        (145, 12, 0),
    ]]
    fillet(fillet_2_edges, radius=FILLET_2_R)

    # 草图8 → 切除-拉伸12 (cut)
    with BuildSketch(Plane.ZY.offset(40)):
        with Locations((0, 8.401146894)):
            Rectangle(SKETCH_8_W, SKETCH_8_H)
    extrude(amount=-CUT_EXTRUDE_12_DEPTH, mode=Mode.SUBTRACT)


solid = part.part
